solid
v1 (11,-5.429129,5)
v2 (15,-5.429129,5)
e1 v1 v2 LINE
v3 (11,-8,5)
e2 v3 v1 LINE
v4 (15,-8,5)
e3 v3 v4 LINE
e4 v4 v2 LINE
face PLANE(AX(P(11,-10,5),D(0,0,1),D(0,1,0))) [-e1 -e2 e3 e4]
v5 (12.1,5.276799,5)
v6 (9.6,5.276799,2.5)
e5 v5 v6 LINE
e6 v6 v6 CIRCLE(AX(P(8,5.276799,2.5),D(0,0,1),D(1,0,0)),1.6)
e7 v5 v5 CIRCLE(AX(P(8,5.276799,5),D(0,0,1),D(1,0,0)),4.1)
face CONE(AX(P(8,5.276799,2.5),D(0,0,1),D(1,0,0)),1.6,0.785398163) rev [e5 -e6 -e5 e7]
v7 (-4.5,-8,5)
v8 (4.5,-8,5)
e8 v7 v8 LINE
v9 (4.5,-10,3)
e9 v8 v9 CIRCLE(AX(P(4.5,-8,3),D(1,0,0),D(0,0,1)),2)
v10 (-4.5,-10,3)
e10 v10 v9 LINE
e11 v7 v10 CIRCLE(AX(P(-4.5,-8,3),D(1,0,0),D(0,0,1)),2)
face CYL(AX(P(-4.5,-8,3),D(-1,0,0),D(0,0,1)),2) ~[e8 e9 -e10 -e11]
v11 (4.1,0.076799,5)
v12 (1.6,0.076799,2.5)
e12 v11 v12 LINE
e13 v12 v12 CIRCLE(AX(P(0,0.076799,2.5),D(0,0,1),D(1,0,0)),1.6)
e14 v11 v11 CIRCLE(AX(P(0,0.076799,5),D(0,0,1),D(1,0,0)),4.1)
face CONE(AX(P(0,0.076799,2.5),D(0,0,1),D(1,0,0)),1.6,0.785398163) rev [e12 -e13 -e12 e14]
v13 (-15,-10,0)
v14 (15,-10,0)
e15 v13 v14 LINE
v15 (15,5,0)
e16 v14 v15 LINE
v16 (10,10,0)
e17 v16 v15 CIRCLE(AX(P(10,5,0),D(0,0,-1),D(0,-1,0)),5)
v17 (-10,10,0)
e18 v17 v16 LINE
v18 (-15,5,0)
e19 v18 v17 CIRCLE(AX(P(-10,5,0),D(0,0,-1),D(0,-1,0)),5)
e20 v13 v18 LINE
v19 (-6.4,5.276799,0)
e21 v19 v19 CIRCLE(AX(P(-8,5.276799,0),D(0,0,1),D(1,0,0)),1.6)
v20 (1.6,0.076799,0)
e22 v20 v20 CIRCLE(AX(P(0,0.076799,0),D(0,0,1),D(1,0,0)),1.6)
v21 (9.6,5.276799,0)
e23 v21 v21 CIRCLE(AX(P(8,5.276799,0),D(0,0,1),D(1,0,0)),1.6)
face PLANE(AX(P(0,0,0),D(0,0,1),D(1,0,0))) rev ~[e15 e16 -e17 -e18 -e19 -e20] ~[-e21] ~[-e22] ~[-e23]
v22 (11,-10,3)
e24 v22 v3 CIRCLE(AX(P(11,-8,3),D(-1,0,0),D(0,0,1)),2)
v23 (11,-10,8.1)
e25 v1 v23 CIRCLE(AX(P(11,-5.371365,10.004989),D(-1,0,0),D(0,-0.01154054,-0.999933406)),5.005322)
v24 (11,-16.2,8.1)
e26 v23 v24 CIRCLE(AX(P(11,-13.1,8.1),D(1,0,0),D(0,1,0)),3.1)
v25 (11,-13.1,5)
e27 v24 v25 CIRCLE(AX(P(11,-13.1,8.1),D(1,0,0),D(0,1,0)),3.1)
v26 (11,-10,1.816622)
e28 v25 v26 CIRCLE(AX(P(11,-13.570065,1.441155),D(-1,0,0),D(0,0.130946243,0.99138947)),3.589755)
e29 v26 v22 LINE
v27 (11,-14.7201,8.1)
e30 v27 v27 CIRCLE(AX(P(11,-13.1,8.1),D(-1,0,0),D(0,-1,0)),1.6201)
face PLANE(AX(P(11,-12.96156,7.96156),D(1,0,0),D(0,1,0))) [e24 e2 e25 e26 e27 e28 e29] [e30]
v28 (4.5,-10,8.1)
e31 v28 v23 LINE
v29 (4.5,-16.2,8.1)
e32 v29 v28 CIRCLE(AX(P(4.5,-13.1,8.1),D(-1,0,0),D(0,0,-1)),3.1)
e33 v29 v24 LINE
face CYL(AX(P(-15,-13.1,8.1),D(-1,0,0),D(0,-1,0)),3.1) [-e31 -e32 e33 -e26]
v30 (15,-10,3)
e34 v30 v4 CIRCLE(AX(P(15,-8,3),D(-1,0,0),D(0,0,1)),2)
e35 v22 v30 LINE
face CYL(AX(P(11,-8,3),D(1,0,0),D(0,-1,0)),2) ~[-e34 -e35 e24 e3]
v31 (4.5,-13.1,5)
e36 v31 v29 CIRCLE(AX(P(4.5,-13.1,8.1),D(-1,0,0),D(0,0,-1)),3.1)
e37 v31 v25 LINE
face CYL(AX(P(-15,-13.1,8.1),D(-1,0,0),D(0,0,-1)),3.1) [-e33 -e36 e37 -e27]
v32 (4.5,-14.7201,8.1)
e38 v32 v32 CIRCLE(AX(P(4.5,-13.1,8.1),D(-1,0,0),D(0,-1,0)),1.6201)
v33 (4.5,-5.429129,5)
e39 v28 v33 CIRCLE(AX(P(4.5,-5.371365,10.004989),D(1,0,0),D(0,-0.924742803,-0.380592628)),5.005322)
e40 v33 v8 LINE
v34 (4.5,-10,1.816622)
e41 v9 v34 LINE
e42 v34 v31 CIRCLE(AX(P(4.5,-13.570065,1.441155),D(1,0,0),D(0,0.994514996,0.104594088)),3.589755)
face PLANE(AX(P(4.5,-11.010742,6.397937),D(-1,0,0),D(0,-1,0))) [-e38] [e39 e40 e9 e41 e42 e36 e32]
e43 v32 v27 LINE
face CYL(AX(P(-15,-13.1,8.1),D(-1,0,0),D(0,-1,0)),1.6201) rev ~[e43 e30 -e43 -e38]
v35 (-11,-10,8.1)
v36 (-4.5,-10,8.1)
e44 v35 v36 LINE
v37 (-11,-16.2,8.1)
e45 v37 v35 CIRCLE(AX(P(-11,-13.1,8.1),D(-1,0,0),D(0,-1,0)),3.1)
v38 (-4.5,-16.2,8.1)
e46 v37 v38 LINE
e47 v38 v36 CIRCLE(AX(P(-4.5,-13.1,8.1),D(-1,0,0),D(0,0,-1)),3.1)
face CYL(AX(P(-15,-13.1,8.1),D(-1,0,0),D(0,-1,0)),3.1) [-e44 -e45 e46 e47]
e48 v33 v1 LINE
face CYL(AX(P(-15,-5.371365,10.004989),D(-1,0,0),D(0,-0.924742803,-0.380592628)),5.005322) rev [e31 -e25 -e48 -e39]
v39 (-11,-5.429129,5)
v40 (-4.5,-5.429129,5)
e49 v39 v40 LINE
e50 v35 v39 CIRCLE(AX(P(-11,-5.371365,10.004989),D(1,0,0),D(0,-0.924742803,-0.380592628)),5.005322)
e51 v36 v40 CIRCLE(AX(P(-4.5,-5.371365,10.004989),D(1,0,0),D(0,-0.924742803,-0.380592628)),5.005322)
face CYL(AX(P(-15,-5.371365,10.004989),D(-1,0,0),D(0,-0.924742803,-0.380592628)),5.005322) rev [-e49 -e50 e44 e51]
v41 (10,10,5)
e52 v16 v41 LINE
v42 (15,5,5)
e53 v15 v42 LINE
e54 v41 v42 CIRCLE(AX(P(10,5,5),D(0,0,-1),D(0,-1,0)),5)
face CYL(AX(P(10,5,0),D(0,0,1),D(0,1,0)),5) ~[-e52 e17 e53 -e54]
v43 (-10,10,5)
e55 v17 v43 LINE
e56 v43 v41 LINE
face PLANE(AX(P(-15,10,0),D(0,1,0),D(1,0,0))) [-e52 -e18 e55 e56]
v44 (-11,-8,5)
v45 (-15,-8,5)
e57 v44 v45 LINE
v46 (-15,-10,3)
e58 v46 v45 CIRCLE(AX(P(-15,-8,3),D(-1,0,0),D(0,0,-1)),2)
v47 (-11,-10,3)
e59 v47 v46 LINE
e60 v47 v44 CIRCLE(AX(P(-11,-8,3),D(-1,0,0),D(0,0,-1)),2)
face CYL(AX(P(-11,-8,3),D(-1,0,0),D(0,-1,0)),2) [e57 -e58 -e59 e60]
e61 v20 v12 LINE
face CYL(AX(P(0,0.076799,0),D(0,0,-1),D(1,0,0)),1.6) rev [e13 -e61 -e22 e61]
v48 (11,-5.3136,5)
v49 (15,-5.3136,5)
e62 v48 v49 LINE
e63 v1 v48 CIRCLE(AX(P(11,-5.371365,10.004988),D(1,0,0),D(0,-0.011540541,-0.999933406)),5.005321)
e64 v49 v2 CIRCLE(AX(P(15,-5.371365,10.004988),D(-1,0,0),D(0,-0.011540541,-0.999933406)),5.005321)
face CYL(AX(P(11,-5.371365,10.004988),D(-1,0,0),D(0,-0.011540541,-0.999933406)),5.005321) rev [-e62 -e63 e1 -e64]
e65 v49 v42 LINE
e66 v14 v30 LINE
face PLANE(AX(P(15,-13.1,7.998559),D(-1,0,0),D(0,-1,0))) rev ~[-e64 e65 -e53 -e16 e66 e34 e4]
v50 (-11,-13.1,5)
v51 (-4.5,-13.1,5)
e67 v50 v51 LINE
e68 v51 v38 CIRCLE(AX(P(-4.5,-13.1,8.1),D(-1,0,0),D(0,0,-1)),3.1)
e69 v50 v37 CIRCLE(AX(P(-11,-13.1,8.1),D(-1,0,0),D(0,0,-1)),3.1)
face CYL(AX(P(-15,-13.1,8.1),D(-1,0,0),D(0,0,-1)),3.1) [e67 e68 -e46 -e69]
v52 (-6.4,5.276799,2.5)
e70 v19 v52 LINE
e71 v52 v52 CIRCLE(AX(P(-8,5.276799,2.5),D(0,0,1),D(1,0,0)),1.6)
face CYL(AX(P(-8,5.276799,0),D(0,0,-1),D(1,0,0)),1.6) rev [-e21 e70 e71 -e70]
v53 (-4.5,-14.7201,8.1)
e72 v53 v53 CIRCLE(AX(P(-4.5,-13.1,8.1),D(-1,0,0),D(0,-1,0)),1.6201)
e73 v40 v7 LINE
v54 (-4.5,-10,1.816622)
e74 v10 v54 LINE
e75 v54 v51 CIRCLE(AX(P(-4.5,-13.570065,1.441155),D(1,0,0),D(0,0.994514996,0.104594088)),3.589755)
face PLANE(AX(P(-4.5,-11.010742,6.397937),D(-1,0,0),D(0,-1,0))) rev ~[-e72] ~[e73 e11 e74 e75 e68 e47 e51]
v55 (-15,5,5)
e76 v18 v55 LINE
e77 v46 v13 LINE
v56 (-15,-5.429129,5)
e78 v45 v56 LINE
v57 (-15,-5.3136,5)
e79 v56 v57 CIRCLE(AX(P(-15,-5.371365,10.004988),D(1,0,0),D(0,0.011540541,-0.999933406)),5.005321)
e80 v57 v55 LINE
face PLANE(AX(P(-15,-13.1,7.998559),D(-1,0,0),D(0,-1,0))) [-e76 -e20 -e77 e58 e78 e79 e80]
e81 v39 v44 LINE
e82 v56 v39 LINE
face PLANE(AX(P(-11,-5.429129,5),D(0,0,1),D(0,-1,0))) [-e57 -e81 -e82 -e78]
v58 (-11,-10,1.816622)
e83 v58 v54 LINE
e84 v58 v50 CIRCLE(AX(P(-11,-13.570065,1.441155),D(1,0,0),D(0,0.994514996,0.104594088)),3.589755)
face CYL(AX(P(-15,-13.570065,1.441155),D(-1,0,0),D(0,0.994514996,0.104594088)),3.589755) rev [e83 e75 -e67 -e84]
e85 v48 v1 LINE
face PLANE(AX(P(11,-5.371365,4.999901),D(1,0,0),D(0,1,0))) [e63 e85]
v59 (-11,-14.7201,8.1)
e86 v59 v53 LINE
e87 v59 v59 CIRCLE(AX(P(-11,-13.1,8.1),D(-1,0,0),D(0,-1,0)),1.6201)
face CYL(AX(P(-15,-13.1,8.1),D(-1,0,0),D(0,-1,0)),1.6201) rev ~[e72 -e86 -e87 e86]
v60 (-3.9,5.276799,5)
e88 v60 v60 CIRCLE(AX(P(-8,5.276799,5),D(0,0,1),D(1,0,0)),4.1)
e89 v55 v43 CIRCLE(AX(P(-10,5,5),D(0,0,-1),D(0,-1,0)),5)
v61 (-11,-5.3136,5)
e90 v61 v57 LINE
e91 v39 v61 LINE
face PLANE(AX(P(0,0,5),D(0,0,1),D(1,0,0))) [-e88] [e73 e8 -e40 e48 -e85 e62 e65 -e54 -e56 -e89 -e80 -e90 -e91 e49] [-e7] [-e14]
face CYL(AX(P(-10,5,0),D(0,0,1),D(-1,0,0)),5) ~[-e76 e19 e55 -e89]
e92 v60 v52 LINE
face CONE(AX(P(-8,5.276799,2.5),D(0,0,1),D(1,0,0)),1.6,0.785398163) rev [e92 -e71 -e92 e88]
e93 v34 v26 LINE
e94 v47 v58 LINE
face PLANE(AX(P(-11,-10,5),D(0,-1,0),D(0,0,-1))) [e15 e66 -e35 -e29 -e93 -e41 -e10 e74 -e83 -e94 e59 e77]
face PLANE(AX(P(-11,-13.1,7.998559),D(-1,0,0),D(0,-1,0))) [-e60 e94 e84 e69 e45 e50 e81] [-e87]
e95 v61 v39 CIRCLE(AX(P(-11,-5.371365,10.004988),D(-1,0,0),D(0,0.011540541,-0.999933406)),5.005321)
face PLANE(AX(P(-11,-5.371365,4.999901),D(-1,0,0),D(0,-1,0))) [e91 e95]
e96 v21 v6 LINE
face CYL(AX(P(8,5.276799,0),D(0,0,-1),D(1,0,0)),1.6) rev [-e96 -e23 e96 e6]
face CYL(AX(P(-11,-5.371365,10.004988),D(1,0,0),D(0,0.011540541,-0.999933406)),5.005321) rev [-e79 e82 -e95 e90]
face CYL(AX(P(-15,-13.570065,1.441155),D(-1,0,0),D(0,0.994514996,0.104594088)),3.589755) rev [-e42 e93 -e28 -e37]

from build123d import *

# Parameters (mm, degrees)
F0_W      = 30
F0_H      = 20
F0_R      = 1.6
F1_DEPTH  = 5
F3_DEPTH  = 30
F7_DEPTH  = 7
F9_DEPTH  = 7
F10_SIZE  = 2.5
F11_R     = 5
F12_R     = 1.6200998357
F13_DEPTH = 30.001
F14_R     = 2
F17_DEPTH = 9


with BuildPart() as f1:
    # F0 (on Top) → F1 (new body)
    with BuildSketch(Plane.XY):
        Rectangle(F0_W, F0_H)
        with Locations((-8, 5.2767994255)):
            Circle(F0_R, mode=Mode.SUBTRACT)
        with Locations((0, 0.0767994255)):
            Circle(F0_R, mode=Mode.SUBTRACT)
        with Locations((8, 5.2767994255)):
            Circle(F0_R, mode=Mode.SUBTRACT)
    extrude(amount=F1_DEPTH)

    # F2 (on face) → F3 (join, through all)
    with BuildSketch(Plane(origin=(-15, 0, 0), x_dir=(0, -1, 0), z_dir=(-1, 0, 0))):
        with BuildLine():
            ThreePointArc((13.1, 5), (15.2920310217, 5.9079689783), (16.2, 8.1))
            ThreePointArc((16.2, 8.1), (13.1, 11.2), (10, 8.1))
            ThreePointArc((10, 8.1), (10.9079689783, 5.9079689783), (13.1, 5))
        make_face()
        with BuildLine():
            ThreePointArc((13.1, 5), (10.9079689783, 5.9079689783), (10, 8.1))
            ThreePointArc((10, 8.1), (8.1808280522, 5.8625059643), (5.4291286506, 5))
            Line((5.4291286506, 5), (10, 5))
            Line((10, 5), (10, 1.816622098))
            ThreePointArc((10, 1.816622098), (10.998268655, 3.9455916428), (13.1, 5))
        make_face()
    extrude(amount=-F3_DEPTH)

    # F6 (on offset) → F7 (cut)
    with BuildSketch(Plane.YZ.offset(11)):
        with BuildLine():
            ThreePointArc((-13.1, 5), (-10.9079689783, 5.9079689783), (-10, 8.1))
            ThreePointArc((-10, 8.1), (-15.2920310217, 10.2920310217), (-13.1, 5))
        make_face()
        with BuildLine():
            ThreePointArc((-5.4291286506, 5), (-8.1808280522, 5.8625059643), (-10, 8.1))
            ThreePointArc((-10, 8.1), (-10.9079689783, 5.9079689783), (-13.1, 5))
            ThreePointArc((-13.1, 5), (-10.998268655, 3.9455916428), (-10, 1.816622098))
            Line((-10, 1.816622098), (-10, 5))
            Line((-10, 5), (-5.4291286506, 5))
        make_face()
        with BuildLine():
            Line((-5.3136004135, 5), (-5.4291286506, 5))
            ThreePointArc((-5.4291286506, 5), (-5.371364532, 4.9996666743), (-5.3136004135, 5))
        make_face()
    extrude(amount=F7_DEPTH, mode=Mode.SUBTRACT)

    # F8 (on offset) → F9 (cut)
    with BuildSketch(Plane(origin=(-11, 0, 0), x_dir=(0, -1, 0), z_dir=(-1, 0, 0))):
        with BuildLine():
            ThreePointArc((13.1, 5), (15.2920310217, 5.9079689783), (16.2, 8.1))
            ThreePointArc((16.2, 8.1), (13.1, 11.2), (10, 8.1))
            ThreePointArc((10, 8.1), (10.9079689783, 5.9079689783), (13.1, 5))
        make_face()
        with BuildLine():
            ThreePointArc((5.3136004135, 5), (5.371364532, 4.9996666743), (5.4291286506, 5))
            Line((5.4291286506, 5), (5.3136004135, 5))
        make_face()
        with BuildLine():
            ThreePointArc((13.1, 5), (10.9079689783, 5.9079689783), (10, 8.1))
            ThreePointArc((10, 8.1), (8.1808280522, 5.8625059643), (5.4291286506, 5))
            Line((5.4291286506, 5), (10, 5))
            Line((10, 5), (10, 1.816622098))
            ThreePointArc((10, 1.816622098), (10.998268655, 3.9455916428), (13.1, 5))
        make_face()
    extrude(amount=F9_DEPTH, mode=Mode.SUBTRACT)

    # F10
    f10_edges = [f1.edges().sort_by_distance(p)[0] for p in [
        (-9.6, 5.276799, 5),
        (-1.6, 0.076799, 5),
        (6.4, 5.276799, 5),
    ]]
    chamfer(f10_edges, length=F10_SIZE)

    # F11
    f11_edges = [f1.edges().sort_by_distance(p)[0] for p in [
        (-15, 10, 2.5),
        (15, 10, 2.5),
    ]]
    fillet(f11_edges, radius=F11_R)

    # F12 (on face) → F13 (cut, through all)
    with BuildSketch(Plane(origin=(-15, 0, 0), x_dir=(0, -1, 0), z_dir=(-1, 0, 0))):
        with Locations((13.1, 8.1)):
            Circle(F12_R)
    extrude(amount=-F13_DEPTH, mode=Mode.SUBTRACT)

    # F14
    f14_edges = [f1.edges().sort_by_distance(p)[0] for p in [
        (-13, -10, 5),
        (13, -10, 5),
    ]]
    fillet(f14_edges, radius=F14_R)

    # F16 (on offset) → F17 (cut)
    with BuildSketch(Plane(origin=(-4.5, 0, 0), x_dir=(0, -1, 0), z_dir=(-1, 0, 0))):
        with BuildLine():
            ThreePointArc((10, 1.816622098), (10.998268655, 3.9455916428), (13.1, 5))
            ThreePointArc((13.1, 5), (15.2920310217, 10.2920310217), (10, 8.1))
            ThreePointArc((10, 8.1), (8.1808280522, 5.8625059643), (5.4291286506, 5))
            Line((5.4291286506, 5), (8, 5))
            ThreePointArc((8, 5), (9.4142135624, 4.4142135624), (10, 3))
            Line((10, 3), (10, 1.816622098))
        make_face()
    extrude(amount=-F17_DEPTH, mode=Mode.SUBTRACT)


solid = f1.part
